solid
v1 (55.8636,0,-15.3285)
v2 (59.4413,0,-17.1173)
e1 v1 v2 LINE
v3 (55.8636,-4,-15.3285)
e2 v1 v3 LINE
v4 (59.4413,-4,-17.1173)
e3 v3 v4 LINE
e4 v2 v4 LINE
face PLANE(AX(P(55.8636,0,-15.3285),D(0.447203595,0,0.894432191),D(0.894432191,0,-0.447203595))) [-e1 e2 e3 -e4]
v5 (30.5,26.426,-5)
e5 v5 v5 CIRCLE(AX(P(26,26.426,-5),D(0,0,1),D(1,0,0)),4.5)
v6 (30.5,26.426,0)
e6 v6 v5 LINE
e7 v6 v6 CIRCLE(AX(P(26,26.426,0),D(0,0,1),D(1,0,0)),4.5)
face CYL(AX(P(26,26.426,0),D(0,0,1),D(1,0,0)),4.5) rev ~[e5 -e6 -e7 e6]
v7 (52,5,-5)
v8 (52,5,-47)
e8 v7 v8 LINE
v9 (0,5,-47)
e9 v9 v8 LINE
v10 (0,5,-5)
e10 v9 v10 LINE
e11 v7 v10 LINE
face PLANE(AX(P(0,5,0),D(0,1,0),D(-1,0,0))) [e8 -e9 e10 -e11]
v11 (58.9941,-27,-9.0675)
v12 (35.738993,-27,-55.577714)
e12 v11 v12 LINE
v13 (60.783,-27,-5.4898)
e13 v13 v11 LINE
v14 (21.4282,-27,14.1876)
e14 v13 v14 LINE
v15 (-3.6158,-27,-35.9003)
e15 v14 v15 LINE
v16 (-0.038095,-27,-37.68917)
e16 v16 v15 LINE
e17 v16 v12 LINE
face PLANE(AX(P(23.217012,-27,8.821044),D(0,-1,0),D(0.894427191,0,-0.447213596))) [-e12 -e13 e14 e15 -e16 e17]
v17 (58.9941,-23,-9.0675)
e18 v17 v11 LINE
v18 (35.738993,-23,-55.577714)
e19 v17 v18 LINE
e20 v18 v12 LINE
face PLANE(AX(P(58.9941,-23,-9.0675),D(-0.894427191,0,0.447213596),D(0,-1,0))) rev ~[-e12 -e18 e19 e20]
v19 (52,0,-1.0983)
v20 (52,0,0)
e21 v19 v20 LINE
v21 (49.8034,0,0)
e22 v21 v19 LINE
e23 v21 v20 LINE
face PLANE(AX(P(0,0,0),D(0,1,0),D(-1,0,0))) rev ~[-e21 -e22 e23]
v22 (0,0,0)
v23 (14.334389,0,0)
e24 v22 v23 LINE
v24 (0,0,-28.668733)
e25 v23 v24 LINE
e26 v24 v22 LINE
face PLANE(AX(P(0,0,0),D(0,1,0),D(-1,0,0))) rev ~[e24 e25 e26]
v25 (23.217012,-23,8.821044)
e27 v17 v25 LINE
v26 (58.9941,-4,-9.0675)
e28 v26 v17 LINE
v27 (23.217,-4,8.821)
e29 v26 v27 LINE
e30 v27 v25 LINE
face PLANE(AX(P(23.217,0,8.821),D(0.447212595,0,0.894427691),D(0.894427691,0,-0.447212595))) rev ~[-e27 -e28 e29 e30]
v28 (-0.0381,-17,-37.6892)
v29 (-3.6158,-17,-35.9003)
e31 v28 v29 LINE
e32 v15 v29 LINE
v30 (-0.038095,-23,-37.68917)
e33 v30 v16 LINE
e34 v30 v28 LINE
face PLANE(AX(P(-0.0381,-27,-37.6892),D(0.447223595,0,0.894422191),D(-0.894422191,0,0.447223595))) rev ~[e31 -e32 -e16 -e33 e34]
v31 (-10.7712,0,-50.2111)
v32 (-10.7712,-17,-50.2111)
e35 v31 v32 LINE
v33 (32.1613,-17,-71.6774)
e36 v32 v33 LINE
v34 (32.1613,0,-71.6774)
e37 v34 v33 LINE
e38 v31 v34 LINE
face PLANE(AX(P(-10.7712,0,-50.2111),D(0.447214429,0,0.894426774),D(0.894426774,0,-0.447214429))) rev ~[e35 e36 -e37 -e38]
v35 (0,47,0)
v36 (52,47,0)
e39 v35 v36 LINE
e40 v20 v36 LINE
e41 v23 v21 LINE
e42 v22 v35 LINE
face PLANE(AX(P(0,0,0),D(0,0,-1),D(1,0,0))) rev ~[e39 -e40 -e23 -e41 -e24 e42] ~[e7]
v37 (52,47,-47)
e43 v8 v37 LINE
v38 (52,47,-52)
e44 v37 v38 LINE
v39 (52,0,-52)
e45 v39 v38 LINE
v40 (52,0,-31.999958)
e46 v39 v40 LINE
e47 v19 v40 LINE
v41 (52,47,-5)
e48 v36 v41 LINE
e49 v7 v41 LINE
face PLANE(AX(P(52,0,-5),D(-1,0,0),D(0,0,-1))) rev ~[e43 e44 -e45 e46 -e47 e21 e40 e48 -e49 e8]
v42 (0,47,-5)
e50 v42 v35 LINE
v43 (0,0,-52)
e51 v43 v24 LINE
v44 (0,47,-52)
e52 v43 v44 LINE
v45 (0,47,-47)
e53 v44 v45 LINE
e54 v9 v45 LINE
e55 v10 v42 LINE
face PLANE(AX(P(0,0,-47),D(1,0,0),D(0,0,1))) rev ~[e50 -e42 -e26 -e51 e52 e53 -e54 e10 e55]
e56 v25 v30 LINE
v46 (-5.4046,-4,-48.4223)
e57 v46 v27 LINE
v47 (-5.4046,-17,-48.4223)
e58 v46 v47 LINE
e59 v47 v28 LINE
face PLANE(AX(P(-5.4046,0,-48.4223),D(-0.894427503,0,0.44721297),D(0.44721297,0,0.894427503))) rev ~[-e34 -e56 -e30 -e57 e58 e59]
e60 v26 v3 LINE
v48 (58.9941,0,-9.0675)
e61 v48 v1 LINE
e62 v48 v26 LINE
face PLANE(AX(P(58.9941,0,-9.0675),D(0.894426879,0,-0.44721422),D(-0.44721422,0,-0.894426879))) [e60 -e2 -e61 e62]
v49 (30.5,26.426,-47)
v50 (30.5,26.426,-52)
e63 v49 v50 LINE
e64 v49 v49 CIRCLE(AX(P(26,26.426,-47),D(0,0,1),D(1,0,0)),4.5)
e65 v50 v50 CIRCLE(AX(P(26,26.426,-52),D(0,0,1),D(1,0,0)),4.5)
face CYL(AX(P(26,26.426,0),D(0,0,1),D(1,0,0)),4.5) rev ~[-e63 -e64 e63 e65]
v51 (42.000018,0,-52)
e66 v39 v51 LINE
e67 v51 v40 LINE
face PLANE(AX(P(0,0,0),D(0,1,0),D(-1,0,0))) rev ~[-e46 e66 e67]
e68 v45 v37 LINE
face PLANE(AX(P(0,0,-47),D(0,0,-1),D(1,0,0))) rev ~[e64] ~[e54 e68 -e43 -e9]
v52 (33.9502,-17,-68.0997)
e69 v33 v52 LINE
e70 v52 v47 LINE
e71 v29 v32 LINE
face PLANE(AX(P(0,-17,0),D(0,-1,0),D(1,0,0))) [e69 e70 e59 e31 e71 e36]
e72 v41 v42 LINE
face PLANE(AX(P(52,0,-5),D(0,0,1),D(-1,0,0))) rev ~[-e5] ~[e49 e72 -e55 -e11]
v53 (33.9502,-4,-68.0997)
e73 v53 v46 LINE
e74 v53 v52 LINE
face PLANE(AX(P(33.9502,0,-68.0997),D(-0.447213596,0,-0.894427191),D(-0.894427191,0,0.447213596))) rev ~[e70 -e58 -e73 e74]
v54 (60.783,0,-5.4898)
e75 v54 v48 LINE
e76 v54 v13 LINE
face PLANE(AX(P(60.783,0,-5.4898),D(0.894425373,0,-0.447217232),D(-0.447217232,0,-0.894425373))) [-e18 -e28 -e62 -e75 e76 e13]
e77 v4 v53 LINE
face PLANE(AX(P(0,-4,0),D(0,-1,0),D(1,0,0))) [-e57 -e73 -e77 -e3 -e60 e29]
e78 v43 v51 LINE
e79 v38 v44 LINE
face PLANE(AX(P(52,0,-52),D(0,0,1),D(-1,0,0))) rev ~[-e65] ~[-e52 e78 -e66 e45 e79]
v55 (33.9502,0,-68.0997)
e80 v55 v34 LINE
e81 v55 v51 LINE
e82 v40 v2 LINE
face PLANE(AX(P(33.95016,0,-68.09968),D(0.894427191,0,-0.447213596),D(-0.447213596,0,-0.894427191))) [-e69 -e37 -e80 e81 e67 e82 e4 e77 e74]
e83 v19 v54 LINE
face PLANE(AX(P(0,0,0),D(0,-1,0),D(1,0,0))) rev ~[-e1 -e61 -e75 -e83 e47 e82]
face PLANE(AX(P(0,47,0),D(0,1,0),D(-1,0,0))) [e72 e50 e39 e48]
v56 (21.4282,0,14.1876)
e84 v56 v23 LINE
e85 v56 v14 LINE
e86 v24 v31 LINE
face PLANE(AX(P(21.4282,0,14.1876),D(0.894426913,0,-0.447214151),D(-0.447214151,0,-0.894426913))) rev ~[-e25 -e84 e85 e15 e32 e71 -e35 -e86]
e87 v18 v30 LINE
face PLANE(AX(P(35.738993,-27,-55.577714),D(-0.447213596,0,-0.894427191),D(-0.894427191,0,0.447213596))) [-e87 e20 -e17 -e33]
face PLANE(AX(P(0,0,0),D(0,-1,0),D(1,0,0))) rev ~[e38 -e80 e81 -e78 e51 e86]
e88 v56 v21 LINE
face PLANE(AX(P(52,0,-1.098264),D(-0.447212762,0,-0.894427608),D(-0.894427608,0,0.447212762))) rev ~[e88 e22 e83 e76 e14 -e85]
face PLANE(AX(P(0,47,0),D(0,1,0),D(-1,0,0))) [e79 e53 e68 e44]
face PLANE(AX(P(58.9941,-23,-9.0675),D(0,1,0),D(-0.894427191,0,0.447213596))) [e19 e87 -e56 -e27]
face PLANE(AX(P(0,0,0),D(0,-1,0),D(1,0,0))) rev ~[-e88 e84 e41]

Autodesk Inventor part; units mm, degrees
ref_plane "YZ Plane" through (0, 0, 0) normal (1, 0, 0) x (0, 1, 0)
ref_plane "XZ Plane" through (0, 0, 0) normal (0, 1, 0) x (-1, 0, 0)
ref_plane "XY Plane" through (0, 0, 0) normal (0, 0, 1) x (1, 0, 0)
sketch "스케치1" plane through (0, 0, 0) normal (0, 1, 0) x (-1, 0, 0)
  line L0 (0, 0) -> (-52, 0)
  line L1 (-52, 0) -> (-52, -52)
  line L2 (-52, -52) -> (0, -52)
  line L3 (0, -52) -> (0, 0)
  line L4 (-52, -5) -> (0, -5)
  line L5 (0, -47) -> (-52, -47)
  dimension "d0" = 52
  dimension "d1" = 52
  dimension "d2" = 5
  dimension "d7" = 5
extrude "돌출1" add sketch "스케치1" along normal blind 5 contours L3 L5 L1 L4
extrude "돌출2" add sketch "스케치1" along normal blind 47 contours L3 L4 L1 L0 | L3 L2 L1 L5
sketch "스케치2" plane through (0, 0, 0) normal (0, -1, 0) x (1, 0, 0)
  line L0 (52, -52) -> (0, -52) projected
  line L1 (52, -52) -> (52, -32)
  line L2 (52, 0) -> (52, -52) projected
  line L3 (52, -52) -> (42, -52)
  line L4 (42, -52) -> (52, -32)
  line L5 (42, -52) -> (32.1613, -71.6774)
  line L6 (32.1613, -71.6774) -> (64.3607, -7.2786)
  line L7 (64.3607, -7.2786) -> (21.4282, 14.1876)
  line L8 (21.4282, 14.1876) -> (-10.7712, -50.2111)
  line L9 (-10.7712, -50.2111) -> (32.1613, -71.6774)
  line L10 (-5.4046, -48.4223) -> (23.217, 8.821)
  line L11 (23.217, 8.821) -> (58.9941, -9.0675)
  line L12 (58.9941, -9.0675) -> (30.3724, -66.3108)
  line L13 (33.9502, -68.0997) -> (-5.4046, -48.4223)
  line L14 (60.783, -5.4898) -> (55.8636, -15.3285)
  line L15 (55.8636, -15.3285) -> (59.4413, -17.1173)
  point P0 (0, 0)
  dimension "d0" = 52
  dimension "d1" = 52
  dimension "d2" = 5
  dimension "d7" = 5
  dimension "d8" = 20
  dimension "d9" = 10
  dimension "d10" = 22
  dimension "d11" = 72
  dimension "d12" = 48
  dimension "d13" = 4
  dimension "d14" = 11
extrude "돌출3" add sketch "스케치2" along normal blind 4 contours L5 L13 L12 L0 | L0 L12 L2 L4 | L2 L12 L15 L6 | L12 L13 L0 | L0 L13 L10 L11 L2 L12 | L2 L11 L12
extrude "돌출4" add sketch "스케치2" along normal blind 27 contours L5 L9 L8 L7 L2 L11 L10 L13 | L2 L7 L14 L11
sketch "스케치3" plane through (58.9941, -27, -9.0675) normal (-0.4472136, 0, -0.8944272) x (-0.8944272, 0, 0.4472136)
  line L0 (0, 23) -> (0, 0) projected
  line L1 (0, 0) -> (0, 4)
  line L2 (0, 4) -> (40, 4)
  line L3 (40, 23) -> (40, 0) projected
  line L4 (40, 0) -> (0, 0) projected
  point P0 (56.821, 27)
  dimension "d19" = 4
extrude "돌출5" add sketch "스케치3" along normal blind 52
sketch "스케치4" plane through (0, -27, 0) normal (0, -1, 0) x (1, 0, 0)
  line L0 (32.1613, -71.6774) -> (33.9502, -68.0997) projected
  line L1 (33.9502, -68.0997) -> (-5.4046, -48.4223) projected
  line L2 (-5.4046, -48.4223) -> (-0.0381, -37.6892) projected
  line L3 (35.739, -55.5777) -> (-0.0381, -37.6892) projected
  line L4 (60.783, -5.4898) -> (35.739, -55.5777) projected
  line L5 (60.783, -5.4898) -> (21.4282, 14.1876) projected
  line L6 (21.4282, 14.1876) -> (-10.7712, -50.2111) projected
  line L7 (-10.7712, -50.2111) -> (32.1613, -71.6774) projected
  line L8 (-0.0381, -37.6892) -> (-3.6158, -35.9003)
  line L9 (32.1613, -71.6774) -> (42, -52) projected
  line L10 (33.9502, -68.0997) -> (32.1613, -71.6774)
  line L11 (32.1613, -71.6774) -> (-10.7712, -50.2111)
  line L12 (-3.6158, -35.9003) -> (-0.0381, -37.6892)
  point P0 (0, 0)
extrude "돌출6" cut sketch "스케치4" against normal blind 10 contours L7 L6 L8 L2 L1 L0
sketch "스케치5" plane through (0, 47, 0) normal (0, 0, 1) x (1, 0, 0)
  line L0 (0, -47) -> (14.3344, -47) projected
  line L1 (14.3344, -47) -> (49.8034, -47) projected
  line L2 (49.8034, -47) -> (52, -47) projected
  line L3 (52, -47) -> (52, 0) projected
  line L4 (0, 0) -> (52, 0) projected
  line L5 (0, -47) -> (0, 0) projected
  circle A0 centre (26, -20.574) radius 4.5
  point P0 (26, 0)
  dimension "d24" = 9
  dimension "d25" = 16.074
extrude "돌출7" cut sketch "스케치5" against normal blind 100 contours A0
properties part number "camera_case"
